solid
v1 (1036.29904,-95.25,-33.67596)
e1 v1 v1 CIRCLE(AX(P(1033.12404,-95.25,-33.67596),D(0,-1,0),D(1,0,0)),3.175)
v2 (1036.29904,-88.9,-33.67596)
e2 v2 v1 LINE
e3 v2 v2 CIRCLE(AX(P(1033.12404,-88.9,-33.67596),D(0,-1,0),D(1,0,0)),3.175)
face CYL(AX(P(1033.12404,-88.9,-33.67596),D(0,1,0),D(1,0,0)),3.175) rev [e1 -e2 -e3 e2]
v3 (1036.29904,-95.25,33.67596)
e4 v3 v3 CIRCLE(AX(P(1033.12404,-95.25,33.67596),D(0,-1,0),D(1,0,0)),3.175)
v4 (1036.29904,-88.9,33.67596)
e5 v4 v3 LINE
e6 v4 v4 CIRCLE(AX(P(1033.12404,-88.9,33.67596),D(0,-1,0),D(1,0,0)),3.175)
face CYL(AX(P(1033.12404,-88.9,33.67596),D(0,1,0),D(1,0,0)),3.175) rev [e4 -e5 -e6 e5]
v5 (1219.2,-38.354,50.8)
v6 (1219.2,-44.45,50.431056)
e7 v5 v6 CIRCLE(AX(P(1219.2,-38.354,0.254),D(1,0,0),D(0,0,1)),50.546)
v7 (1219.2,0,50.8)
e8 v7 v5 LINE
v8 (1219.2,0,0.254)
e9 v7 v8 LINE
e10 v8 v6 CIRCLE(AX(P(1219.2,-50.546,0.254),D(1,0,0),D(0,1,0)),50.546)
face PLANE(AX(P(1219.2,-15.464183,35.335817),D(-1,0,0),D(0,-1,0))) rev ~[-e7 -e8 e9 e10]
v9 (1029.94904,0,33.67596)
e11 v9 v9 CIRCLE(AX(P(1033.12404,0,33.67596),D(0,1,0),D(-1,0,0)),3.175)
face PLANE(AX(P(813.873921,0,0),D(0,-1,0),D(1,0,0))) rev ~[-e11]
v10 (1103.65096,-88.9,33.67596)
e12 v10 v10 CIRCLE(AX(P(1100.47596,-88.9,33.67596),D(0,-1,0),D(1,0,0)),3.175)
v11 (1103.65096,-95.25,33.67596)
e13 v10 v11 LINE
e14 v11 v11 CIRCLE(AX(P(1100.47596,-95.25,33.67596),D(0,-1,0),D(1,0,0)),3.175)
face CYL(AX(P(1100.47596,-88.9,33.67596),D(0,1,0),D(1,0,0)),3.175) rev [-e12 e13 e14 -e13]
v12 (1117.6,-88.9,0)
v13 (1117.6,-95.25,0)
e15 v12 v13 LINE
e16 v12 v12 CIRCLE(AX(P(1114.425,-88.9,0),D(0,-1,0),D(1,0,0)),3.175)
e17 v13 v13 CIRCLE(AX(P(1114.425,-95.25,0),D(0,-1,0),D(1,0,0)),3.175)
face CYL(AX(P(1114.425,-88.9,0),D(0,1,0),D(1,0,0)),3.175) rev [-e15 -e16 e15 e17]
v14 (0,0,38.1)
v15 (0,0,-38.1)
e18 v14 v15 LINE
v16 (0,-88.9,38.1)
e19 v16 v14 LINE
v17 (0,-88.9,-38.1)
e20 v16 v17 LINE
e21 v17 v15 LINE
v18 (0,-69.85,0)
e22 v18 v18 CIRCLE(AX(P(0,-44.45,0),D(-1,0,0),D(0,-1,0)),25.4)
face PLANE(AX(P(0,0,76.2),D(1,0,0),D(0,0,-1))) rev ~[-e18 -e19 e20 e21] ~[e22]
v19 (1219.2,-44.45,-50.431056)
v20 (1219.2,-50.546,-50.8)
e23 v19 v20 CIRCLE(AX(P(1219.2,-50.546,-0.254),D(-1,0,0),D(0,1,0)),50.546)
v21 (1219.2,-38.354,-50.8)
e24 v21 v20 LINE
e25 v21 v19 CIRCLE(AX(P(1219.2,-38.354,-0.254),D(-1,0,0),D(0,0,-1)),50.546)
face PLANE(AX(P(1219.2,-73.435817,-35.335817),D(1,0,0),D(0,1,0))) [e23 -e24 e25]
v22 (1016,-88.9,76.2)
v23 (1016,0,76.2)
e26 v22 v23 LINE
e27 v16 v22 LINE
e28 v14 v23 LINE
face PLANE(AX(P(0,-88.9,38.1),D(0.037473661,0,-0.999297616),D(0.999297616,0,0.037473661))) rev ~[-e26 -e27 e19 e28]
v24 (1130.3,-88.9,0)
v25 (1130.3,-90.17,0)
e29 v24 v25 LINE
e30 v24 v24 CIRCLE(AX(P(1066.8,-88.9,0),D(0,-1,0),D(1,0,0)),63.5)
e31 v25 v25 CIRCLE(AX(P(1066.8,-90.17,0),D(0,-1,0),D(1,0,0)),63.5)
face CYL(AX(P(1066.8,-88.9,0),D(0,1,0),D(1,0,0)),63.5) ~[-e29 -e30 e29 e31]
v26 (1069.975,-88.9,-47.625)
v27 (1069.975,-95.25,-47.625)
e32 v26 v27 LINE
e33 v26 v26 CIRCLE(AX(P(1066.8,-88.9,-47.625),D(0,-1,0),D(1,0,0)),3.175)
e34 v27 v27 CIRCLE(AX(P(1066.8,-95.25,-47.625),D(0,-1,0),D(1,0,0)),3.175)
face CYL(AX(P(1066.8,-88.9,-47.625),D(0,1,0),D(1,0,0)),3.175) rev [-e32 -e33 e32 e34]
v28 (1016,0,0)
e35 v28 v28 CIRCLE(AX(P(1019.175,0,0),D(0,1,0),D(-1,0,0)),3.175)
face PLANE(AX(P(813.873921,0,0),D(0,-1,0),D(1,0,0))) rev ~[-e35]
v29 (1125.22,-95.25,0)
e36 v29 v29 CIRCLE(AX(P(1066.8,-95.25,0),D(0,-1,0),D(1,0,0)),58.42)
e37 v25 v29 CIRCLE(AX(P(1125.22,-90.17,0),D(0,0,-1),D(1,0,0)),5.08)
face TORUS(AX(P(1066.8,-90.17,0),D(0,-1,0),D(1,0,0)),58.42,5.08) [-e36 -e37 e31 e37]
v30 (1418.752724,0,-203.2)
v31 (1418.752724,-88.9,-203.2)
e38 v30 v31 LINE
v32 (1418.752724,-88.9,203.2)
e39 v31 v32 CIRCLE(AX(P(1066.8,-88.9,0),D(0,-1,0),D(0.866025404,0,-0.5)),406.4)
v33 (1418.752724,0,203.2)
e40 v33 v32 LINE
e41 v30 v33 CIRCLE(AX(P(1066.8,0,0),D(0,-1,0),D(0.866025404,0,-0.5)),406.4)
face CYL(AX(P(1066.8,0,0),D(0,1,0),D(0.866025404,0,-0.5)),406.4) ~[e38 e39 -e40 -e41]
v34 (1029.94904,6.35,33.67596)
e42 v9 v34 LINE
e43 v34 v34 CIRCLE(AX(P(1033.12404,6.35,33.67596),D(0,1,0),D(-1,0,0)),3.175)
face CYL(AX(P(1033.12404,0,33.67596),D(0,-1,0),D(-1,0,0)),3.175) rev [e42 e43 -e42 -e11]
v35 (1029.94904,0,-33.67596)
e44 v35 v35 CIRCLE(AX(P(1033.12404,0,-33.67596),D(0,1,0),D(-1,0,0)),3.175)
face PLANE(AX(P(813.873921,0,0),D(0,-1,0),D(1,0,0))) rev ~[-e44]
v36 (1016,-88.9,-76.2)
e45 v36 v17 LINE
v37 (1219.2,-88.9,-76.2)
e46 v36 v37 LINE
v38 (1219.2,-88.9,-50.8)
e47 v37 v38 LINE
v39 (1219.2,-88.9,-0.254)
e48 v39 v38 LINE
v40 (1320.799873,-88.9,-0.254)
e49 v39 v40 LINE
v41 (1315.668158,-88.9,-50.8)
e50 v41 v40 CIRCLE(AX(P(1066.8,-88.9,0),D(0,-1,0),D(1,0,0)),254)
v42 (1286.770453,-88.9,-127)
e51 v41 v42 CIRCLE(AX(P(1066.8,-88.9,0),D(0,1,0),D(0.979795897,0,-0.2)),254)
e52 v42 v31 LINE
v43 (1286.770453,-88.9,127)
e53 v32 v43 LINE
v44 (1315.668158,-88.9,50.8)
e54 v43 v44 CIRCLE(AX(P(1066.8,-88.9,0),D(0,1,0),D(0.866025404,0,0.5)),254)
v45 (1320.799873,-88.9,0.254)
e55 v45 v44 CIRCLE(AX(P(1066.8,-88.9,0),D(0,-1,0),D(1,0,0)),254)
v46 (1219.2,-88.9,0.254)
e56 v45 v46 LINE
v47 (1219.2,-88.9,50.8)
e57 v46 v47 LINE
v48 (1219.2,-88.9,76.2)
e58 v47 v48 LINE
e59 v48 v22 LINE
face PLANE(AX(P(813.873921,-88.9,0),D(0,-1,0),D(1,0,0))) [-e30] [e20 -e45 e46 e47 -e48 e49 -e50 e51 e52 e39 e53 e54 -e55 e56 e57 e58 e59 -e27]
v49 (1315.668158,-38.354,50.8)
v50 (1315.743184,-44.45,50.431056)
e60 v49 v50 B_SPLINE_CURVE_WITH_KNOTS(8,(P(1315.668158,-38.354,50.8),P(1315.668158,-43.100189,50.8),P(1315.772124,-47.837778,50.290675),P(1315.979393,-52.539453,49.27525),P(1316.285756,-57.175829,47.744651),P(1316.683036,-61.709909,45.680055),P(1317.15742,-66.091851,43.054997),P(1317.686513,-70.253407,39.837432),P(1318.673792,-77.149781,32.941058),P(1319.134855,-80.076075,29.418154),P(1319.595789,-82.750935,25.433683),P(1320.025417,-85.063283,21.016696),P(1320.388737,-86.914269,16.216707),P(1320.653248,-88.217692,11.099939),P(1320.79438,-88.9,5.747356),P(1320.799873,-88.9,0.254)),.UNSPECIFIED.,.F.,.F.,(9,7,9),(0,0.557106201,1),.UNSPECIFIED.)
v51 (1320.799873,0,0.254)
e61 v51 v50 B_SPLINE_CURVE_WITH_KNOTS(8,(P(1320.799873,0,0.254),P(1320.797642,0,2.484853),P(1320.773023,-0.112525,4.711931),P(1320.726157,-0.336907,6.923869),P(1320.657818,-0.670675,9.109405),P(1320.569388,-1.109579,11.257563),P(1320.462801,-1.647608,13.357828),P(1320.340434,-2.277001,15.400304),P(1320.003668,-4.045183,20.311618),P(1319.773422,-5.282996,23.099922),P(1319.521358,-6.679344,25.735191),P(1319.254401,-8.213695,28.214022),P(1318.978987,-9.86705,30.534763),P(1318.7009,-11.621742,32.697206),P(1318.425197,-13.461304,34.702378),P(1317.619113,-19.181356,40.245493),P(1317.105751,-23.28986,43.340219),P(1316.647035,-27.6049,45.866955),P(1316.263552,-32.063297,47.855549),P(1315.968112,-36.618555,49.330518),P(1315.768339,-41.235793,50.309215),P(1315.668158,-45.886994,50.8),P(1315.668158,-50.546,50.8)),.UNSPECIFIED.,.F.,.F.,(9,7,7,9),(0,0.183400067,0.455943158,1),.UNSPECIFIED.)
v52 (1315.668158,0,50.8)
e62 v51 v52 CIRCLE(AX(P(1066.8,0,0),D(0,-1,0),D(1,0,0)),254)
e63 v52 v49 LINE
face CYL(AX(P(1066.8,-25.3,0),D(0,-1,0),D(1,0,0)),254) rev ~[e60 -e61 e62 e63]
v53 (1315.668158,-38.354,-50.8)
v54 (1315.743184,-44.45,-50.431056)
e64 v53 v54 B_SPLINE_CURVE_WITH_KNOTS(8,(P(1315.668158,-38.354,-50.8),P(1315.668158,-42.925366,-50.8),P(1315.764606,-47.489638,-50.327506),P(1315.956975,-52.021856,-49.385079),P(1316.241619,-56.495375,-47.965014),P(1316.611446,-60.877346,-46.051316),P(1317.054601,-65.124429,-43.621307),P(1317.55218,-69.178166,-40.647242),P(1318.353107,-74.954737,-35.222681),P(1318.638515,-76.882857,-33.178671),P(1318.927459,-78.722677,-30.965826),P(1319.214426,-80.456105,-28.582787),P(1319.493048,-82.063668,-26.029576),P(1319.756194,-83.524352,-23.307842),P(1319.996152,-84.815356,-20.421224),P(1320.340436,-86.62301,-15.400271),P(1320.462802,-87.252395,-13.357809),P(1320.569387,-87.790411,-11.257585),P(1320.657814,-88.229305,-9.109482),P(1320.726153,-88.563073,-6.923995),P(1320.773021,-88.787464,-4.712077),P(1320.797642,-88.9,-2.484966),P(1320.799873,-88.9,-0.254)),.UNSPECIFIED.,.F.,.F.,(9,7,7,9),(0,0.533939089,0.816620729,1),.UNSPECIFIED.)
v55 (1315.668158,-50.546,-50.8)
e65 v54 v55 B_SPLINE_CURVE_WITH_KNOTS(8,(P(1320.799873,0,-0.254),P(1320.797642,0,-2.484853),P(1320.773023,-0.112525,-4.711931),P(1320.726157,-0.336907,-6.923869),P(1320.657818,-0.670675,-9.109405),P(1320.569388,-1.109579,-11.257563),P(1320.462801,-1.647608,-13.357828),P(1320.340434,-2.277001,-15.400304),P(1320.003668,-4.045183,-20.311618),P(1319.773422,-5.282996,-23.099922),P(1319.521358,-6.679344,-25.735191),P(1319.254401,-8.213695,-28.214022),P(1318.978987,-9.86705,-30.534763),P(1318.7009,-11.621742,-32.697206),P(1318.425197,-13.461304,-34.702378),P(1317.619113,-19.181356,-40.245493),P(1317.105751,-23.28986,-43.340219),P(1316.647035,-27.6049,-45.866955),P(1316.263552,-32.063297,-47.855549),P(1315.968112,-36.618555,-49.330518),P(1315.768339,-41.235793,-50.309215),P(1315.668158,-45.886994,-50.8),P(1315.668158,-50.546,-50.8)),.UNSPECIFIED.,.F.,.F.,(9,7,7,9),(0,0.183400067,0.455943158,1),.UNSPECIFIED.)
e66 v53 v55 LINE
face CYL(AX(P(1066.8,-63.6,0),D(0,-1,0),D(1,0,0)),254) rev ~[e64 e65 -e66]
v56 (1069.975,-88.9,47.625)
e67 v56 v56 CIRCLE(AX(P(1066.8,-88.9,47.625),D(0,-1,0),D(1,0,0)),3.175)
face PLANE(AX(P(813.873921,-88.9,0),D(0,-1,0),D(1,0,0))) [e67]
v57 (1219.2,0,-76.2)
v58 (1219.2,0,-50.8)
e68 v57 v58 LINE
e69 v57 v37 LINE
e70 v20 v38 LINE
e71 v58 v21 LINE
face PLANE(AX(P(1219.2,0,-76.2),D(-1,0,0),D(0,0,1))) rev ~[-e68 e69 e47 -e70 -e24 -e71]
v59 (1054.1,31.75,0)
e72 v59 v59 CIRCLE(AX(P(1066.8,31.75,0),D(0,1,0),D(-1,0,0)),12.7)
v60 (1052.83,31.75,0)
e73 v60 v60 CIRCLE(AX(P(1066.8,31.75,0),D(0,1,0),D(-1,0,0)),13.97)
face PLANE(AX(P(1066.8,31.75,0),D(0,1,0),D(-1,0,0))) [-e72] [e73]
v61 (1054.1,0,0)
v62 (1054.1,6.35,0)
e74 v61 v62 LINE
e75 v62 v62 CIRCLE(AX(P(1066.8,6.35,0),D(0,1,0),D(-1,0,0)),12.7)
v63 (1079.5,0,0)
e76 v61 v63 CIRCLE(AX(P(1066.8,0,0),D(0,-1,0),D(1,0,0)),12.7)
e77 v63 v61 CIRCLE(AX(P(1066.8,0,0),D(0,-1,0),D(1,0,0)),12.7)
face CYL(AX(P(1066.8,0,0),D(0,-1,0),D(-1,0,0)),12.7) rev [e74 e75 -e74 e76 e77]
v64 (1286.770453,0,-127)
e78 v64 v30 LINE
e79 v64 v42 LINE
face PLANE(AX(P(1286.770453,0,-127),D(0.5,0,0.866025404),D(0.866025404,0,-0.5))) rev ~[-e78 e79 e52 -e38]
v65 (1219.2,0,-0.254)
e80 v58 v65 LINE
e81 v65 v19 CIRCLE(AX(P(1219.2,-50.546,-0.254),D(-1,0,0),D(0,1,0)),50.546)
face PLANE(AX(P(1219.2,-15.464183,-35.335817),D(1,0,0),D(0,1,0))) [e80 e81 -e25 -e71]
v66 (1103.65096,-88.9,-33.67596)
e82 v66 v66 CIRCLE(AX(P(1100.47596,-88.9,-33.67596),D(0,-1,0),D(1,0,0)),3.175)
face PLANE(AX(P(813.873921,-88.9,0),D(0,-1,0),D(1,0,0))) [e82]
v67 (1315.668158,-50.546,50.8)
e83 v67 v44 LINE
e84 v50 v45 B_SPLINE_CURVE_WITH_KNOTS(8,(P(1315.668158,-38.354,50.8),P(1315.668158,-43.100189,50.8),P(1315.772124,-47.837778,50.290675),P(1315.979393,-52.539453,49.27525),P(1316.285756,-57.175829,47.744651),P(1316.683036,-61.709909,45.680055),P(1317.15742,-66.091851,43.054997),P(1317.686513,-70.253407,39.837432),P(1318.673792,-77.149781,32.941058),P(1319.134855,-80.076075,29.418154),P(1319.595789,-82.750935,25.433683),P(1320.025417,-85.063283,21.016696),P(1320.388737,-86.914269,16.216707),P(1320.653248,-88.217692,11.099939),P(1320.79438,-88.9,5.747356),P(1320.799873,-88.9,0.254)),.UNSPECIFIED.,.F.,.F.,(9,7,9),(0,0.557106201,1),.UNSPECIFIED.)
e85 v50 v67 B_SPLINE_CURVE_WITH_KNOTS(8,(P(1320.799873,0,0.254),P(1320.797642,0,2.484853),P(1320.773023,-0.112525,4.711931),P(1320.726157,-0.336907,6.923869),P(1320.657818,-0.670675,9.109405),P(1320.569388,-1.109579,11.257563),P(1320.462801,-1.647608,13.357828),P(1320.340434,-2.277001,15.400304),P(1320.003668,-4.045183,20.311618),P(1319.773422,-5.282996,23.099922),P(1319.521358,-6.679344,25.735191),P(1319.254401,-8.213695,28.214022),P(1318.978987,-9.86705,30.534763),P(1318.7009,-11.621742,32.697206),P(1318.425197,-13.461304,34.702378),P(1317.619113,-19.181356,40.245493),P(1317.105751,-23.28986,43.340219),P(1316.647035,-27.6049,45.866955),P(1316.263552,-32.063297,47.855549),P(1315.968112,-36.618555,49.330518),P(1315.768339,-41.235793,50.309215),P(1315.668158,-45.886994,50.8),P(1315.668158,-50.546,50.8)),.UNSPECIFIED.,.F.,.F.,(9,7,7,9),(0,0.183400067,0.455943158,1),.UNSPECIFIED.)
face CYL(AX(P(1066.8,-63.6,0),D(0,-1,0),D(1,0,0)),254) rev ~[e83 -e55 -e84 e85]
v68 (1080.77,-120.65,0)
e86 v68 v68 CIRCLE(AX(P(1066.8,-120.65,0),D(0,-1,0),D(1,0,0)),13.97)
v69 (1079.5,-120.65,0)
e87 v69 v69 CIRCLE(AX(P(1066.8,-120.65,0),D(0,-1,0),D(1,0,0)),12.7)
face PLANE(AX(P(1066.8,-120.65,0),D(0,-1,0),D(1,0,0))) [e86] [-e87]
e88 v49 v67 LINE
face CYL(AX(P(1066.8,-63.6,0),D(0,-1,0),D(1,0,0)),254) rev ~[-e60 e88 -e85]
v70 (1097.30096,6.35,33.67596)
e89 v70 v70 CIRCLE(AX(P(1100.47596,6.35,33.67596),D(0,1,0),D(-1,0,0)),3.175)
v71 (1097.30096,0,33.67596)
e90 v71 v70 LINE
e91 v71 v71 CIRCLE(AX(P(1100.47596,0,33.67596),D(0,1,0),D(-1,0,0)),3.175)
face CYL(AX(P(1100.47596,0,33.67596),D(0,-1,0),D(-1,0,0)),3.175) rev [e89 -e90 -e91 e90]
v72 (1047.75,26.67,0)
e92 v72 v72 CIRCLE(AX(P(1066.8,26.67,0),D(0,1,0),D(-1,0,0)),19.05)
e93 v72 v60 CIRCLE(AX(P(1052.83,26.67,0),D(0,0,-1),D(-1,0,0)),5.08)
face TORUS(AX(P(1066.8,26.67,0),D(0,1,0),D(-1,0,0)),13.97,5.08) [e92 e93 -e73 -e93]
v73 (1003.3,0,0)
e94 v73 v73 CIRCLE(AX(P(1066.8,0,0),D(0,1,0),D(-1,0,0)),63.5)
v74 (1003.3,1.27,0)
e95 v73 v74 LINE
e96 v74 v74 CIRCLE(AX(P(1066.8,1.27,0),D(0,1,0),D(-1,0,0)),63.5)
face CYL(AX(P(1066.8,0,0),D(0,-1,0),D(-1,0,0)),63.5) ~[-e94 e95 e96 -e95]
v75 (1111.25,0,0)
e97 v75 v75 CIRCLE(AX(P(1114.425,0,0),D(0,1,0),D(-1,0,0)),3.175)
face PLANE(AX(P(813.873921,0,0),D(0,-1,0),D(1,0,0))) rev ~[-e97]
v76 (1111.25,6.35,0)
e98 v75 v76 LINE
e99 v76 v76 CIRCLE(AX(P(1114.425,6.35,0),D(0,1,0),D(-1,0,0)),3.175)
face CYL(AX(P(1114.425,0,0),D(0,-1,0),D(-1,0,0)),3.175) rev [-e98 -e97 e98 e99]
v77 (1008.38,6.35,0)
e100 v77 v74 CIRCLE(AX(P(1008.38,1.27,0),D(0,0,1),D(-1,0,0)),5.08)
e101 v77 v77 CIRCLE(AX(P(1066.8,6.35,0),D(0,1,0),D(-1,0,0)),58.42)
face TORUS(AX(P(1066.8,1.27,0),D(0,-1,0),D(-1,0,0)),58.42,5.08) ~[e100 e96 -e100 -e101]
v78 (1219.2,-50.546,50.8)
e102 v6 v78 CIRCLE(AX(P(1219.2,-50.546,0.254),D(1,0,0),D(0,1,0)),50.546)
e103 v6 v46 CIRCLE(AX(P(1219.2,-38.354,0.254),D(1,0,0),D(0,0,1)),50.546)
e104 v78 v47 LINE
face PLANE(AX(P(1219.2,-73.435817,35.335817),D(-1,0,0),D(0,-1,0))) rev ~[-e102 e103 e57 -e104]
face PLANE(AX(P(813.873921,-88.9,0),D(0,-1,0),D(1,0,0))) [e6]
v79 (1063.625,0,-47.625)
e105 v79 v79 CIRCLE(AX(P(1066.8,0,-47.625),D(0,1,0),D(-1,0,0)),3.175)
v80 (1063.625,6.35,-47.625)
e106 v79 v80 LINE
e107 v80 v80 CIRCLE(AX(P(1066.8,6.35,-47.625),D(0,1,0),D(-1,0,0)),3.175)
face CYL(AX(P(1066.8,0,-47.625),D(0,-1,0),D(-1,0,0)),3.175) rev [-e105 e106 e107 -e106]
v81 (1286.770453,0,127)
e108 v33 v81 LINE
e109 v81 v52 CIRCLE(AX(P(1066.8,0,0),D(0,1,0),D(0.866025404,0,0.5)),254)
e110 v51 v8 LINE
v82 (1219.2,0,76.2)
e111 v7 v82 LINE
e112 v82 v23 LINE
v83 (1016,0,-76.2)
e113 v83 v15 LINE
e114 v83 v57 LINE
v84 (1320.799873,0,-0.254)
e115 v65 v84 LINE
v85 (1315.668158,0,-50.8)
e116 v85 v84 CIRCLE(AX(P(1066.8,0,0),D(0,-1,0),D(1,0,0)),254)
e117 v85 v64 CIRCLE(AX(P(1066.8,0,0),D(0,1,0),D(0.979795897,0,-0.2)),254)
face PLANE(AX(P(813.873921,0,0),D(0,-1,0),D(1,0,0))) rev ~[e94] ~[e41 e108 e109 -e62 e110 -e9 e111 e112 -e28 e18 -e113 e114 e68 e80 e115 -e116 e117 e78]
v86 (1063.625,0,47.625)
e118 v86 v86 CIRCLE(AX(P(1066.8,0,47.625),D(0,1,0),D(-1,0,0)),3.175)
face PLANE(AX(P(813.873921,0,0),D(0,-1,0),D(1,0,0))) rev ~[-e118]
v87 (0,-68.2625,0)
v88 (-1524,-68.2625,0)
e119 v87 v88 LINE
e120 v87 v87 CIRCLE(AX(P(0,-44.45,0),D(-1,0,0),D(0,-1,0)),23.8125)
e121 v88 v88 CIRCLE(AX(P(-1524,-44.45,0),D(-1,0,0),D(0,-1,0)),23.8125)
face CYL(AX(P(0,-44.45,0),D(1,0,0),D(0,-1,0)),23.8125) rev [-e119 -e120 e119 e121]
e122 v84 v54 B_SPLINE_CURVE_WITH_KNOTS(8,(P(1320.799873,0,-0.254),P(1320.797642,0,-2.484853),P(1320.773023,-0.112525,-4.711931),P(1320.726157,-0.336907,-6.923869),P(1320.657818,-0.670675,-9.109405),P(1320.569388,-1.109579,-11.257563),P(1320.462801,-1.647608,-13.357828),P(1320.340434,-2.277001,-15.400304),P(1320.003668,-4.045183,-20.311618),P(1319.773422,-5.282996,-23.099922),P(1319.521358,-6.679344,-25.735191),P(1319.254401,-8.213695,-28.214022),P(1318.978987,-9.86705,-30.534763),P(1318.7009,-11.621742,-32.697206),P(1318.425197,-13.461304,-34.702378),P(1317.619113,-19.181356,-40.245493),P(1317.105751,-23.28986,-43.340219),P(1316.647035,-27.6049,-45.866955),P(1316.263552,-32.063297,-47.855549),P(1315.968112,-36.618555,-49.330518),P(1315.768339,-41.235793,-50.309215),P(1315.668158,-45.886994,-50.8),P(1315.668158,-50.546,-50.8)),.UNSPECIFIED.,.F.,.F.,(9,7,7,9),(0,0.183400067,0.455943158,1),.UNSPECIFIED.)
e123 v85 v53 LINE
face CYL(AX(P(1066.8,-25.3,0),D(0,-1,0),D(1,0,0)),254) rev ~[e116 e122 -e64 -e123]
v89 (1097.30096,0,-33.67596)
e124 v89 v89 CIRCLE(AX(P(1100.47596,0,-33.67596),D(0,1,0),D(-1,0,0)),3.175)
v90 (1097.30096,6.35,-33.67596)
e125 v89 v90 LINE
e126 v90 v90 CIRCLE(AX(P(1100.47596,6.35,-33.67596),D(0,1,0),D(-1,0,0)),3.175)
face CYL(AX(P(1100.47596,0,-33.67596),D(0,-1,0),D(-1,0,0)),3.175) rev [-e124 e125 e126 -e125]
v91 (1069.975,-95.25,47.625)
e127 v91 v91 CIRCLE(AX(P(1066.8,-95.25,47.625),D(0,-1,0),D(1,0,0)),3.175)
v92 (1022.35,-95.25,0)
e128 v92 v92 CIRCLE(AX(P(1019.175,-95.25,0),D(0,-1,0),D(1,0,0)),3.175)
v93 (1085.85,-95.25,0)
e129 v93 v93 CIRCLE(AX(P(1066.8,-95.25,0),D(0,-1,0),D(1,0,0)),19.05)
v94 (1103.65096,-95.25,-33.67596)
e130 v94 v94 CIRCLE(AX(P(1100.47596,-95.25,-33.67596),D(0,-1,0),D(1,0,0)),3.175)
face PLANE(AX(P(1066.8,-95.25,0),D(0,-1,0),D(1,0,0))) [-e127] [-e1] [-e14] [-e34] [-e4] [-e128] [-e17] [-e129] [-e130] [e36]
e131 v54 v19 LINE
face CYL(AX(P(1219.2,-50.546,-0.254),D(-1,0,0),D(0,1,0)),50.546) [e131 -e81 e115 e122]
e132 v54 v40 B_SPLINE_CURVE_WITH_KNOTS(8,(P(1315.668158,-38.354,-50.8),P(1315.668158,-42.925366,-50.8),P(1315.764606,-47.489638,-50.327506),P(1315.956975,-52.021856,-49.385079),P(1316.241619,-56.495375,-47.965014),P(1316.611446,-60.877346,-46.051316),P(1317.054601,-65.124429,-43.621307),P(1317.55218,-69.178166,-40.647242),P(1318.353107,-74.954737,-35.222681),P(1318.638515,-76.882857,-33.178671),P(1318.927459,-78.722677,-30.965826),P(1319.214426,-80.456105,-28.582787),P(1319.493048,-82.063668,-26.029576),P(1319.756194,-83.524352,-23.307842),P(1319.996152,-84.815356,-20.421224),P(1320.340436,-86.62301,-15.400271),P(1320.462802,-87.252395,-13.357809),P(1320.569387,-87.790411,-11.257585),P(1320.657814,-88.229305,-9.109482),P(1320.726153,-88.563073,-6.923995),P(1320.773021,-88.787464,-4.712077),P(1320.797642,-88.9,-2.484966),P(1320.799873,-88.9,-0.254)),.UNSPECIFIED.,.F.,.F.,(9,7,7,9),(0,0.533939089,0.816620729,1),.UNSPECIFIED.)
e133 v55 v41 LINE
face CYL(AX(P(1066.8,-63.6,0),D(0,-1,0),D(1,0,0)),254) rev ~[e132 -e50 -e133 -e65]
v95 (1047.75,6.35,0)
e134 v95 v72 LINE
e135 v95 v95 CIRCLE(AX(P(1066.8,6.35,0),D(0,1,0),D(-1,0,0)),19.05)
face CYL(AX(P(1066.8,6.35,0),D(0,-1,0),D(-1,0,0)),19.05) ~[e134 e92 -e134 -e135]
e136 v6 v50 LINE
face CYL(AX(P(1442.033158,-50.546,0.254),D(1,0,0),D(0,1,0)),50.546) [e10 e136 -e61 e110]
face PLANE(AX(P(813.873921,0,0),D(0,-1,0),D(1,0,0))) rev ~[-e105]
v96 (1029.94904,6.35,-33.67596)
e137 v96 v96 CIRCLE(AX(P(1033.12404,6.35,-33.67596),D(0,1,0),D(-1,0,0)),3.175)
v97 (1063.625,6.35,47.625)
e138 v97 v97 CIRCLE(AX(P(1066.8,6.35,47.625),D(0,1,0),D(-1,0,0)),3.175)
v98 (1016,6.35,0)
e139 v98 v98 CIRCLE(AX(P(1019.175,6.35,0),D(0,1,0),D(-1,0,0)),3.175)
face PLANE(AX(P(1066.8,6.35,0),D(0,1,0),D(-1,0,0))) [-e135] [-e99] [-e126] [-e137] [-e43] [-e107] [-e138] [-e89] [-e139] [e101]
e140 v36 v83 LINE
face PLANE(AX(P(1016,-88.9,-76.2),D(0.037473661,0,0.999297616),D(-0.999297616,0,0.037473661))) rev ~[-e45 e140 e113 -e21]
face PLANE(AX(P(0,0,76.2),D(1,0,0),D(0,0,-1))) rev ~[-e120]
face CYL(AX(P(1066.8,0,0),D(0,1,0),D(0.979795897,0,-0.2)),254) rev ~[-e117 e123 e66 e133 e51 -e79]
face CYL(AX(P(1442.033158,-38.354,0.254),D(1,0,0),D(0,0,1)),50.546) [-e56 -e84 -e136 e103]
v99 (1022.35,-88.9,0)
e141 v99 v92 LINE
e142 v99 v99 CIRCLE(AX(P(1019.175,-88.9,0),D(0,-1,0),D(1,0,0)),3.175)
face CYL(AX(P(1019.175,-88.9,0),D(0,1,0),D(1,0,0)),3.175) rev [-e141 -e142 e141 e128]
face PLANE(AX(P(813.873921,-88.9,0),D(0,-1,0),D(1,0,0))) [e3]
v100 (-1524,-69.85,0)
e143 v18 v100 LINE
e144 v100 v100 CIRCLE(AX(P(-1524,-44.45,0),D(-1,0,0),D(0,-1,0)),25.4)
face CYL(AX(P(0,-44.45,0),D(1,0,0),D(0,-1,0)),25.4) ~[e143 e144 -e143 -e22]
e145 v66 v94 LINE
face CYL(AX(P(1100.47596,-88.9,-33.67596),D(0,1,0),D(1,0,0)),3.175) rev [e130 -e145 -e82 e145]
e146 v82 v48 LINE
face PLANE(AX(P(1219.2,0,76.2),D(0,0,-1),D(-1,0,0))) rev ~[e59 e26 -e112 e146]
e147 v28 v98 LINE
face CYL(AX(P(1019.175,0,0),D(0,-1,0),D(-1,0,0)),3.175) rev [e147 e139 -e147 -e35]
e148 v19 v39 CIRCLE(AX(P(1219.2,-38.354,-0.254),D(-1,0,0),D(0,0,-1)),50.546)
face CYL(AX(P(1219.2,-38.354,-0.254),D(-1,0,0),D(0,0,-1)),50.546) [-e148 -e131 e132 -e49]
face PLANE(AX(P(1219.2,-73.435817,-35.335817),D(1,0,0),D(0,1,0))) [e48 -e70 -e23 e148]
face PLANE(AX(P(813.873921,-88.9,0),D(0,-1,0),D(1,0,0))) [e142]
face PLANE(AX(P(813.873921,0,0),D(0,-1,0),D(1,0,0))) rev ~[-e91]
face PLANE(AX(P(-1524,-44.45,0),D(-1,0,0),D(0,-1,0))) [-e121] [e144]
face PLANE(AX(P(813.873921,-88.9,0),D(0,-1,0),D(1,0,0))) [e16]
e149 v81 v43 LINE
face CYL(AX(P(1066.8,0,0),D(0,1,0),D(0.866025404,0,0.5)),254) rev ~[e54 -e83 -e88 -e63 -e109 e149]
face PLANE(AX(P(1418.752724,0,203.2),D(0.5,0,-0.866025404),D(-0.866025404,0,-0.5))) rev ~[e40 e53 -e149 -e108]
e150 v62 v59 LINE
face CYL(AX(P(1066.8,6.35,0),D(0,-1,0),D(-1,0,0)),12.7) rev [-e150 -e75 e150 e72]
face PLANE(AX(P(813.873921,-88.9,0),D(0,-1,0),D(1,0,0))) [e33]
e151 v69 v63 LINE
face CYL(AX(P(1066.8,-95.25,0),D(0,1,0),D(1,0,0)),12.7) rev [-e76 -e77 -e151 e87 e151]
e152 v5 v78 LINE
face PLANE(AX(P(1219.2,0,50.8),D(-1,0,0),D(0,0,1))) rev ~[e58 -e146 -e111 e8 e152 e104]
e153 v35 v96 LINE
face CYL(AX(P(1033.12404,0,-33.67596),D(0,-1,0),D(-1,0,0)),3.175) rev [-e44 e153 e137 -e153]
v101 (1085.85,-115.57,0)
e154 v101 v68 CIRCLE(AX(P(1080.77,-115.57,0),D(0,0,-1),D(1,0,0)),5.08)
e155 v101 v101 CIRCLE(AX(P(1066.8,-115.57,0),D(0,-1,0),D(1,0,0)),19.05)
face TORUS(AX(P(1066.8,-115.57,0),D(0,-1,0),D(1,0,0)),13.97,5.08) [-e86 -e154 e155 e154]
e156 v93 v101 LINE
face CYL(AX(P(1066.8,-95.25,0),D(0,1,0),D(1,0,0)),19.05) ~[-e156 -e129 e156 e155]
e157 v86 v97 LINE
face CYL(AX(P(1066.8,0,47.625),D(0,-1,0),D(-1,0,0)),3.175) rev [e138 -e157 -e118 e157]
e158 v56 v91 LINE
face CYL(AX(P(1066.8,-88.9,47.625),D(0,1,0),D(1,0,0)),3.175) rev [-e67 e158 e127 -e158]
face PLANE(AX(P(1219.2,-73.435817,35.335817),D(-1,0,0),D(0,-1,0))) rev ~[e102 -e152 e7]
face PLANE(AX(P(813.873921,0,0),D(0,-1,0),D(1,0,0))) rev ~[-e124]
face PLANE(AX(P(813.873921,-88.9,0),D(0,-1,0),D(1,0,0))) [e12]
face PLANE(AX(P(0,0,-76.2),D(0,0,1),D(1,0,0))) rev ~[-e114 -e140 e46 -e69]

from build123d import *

# Parameters (mm, degrees)
F1_R          = 12.7
F2_DEPTH      = 88.9
F4_DEPTH      = 152.4
F5_R          = 25.4
F5_R_2        = 23.8125
F6_DEPTH      = 1524
F7_R          = 63.5
F7_R_2        = 3.175
F7_R_3        = 12.7
F8_DEPTH      = 6.35
F9_R          = 19.05
F9_R_2        = 12.7
F10_DEPTH     = 25.4
F11_R         = 5.08
F12_R         = 63.5
F12_R_2       = 3.175
F12_R_3       = 12.7
F13_DEPTH     = 6.35
F14_R         = 19.05
F14_R_2       = 12.7
F15_DEPTH     = 25.4
F16_R         = 5.08
F17_T4_DEPTH  = 222.8331578668
F17_S5_R      = 254
F17_T6_DEPTH  = 119
F17_T10_DEPTH = 222.8331578668
F17_S11_R     = 254
F17_T12_DEPTH = 119
F17_T16_DEPTH = 222.8331578668
F17_S17_R     = 254
F17_T18_DEPTH = 119
F17_T22_DEPTH = 222.8331578668
F17_S23_R     = 254
F17_T24_DEPTH = 119


# Not quite as in the source:
# - a fillet or chamfer that OpenCascade refuses, or shapes differently, is made with other operations: its cross-section is extruded or revolved along the edge and cut away or added


with BuildPart() as f2:
    # F1 (on Front) → F2 (new body)
    with BuildSketch(Plane.XZ):
        with BuildLine():
            Line((0, 76.2), (0, -76.2))
            Line((0, -76.2), (1219.2, -76.2))
            Line((1219.2, -76.2), (1219.2, -50.8))
            Line((1219.2, -50.8), (1315.6681578668, -50.8))
            ThreePointArc((1315.6681578668, -50.8), (1304.2953066, -90.0665273172), (1286.7704525612, -127))
            Line((1286.7704525612, -127), (1418.752724098, -203.2))
            ThreePointArc((1418.752724098, -203.2), (1473.2, 0), (1418.752724098, 203.2))
            Line((1418.752724098, 203.2), (1286.7704525612, 127))
            ThreePointArc((1286.7704525612, 127), (1304.2953066, 90.0665273172), (1315.6681578668, 50.8))
            Line((1315.6681578668, 50.8), (1219.2, 50.8))
            Line((1219.2, 50.8), (1219.2, 76.2))
            Line((1219.2, 76.2), (0, 76.2))
        make_face()
        with Locations((1066.8, 0)):
            Circle(F1_R, mode=Mode.SUBTRACT)
    extrude(amount=F2_DEPTH)

    # F3 (on face) → F4 (cut)
    with BuildSketch(Plane.XZ.offset(88.9)):
        Polygon((1016, 76.2), (0, 76.2), (0, 38.1), align=None)
        Polygon((0, -38.1), (0, -76.2), (1016, -76.2), align=None)
    extrude(amount=-F4_DEPTH, mode=Mode.SUBTRACT)

    # F5 (on face) → F6 (join)
    with BuildSketch(Plane(origin=(0, 0, 0), x_dir=(0, -1, 0), z_dir=(-1, 0, 0))):
        with Locations((44.45, 0)):
            Circle(F5_R)
        with Locations((44.45, 0)):
            Circle(F5_R_2, mode=Mode.SUBTRACT)
    extrude(amount=F6_DEPTH)

    # F7 (on face) → F8 (join)
    with BuildSketch(Plane.XZ.offset(88.9)):
        with Locations((1066.8, 0)):
            Circle(F7_R)
        with Locations((1033.124039546, -33.675960454)):
            Circle(F7_R_2, mode=Mode.SUBTRACT)
        with Locations((1066.8, -47.625)):
            Circle(F7_R_2, mode=Mode.SUBTRACT)
        with Locations((1100.475960454, -33.675960454)):
            Circle(F7_R_2, mode=Mode.SUBTRACT)
        with Locations((1019.175, 0)):
            Circle(F7_R_2, mode=Mode.SUBTRACT)
        with Locations((1033.124039546, 33.675960454)):
            Circle(F7_R_2, mode=Mode.SUBTRACT)
        with Locations((1066.8, 0)):
            Circle(F7_R_3, mode=Mode.SUBTRACT)
        with Locations((1114.425, 0)):
            Circle(F7_R_2, mode=Mode.SUBTRACT)
        with Locations((1066.8, 47.625)):
            Circle(F7_R_2, mode=Mode.SUBTRACT)
        with Locations((1100.475960454, 33.675960454)):
            Circle(F7_R_2, mode=Mode.SUBTRACT)
    extrude(amount=F8_DEPTH)

    # F9 (on face) → F10 (join)
    with BuildSketch(Plane.XZ.offset(95.25)):
        with Locations((1066.8, 0)):
            Circle(F9_R)
        with Locations((1066.8, 0)):
            Circle(F9_R_2, mode=Mode.SUBTRACT)
    extrude(amount=F10_DEPTH)

    # F11
    f11_edges = [f2.edges().sort_by_distance(p)[0] for p in [
        (1047.75, -120.65, 0),
        (1003.3, -95.25, 0),
    ]]
    fillet(f11_edges, radius=F11_R)

    # F12 (on face) → F13 (join)
    with BuildSketch(Plane(origin=(0, 0, 0), x_dir=(-1, 0, 0), z_dir=(0, 1, 0))):
        with Locations((-1066.8, 0)):
            Circle(F12_R)
        with Locations((-1100.475960454, -33.675960454)):
            Circle(F12_R_2, mode=Mode.SUBTRACT)
        with Locations((-1066.8, -47.625)):
            Circle(F12_R_2, mode=Mode.SUBTRACT)
        with Locations((-1033.124039546, -33.675960454)):
            Circle(F12_R_2, mode=Mode.SUBTRACT)
        with Locations((-1114.425, 0)):
            Circle(F12_R_2, mode=Mode.SUBTRACT)
        with Locations((-1100.475960454, 33.675960454)):
            Circle(F12_R_2, mode=Mode.SUBTRACT)
        with Locations((-1066.8, 0)):
            Circle(F12_R_3, mode=Mode.SUBTRACT)
        with Locations((-1019.175, 0)):
            Circle(F12_R_2, mode=Mode.SUBTRACT)
        with Locations((-1066.8, 47.625)):
            Circle(F12_R_2, mode=Mode.SUBTRACT)
        with Locations((-1033.124039546, 33.675960454)):
            Circle(F12_R_2, mode=Mode.SUBTRACT)
    extrude(amount=F13_DEPTH)

    # F14 (on face) → F15 (join)
    with BuildSketch(Plane(origin=(0, 6.35, 0), x_dir=(-1, 0, 0), z_dir=(0, 1, 0))):
        with Locations((-1066.8, 0)):
            Circle(F14_R)
        with Locations((-1066.8, 0)):
            Circle(F14_R_2, mode=Mode.SUBTRACT)
    extrude(amount=F15_DEPTH)

    # F16
    f16_edges = [f2.edges().sort_by_distance(p)[0] for p in [
        (1130.3, 6.35, 0),
        (1085.85, 31.75, 0),
    ]]
    fillet(f16_edges, radius=F16_R)

    # F17: fillet of radius 50.546 on 4 edges, made by hand


with BuildPart() as f17_tool2:
    # F17_s3 → F17_t4 (new body)
    with BuildSketch(Plane.YZ.offset(1442.0331578668)):
        with BuildLine():
            ThreePointArc((-38.354, 50.8), (-74.0954193619, 35.9954193619), (-88.9, 0.254))
            Line((-88.9, 0.254), (-88.9, 50.8))
            Line((-88.9, 50.8), (-38.354, 50.8))
        make_face()
    extrude(amount=-F17_T4_DEPTH)

    # F17_s5 → F17_t6 (intersect, symmetric)
    with BuildSketch(Plane.XZ.offset(63.6)):
        with Locations((1066.8, 0)):
            Circle(F17_S5_R)
    extrude(amount=F17_T6_DEPTH, both=True, mode=Mode.INTERSECT)


with BuildPart() as f2_1:
    add(f2.part)

    # F17_t1: cut F17_tool2
    add(f17_tool2.part, mode=Mode.SUBTRACT)


with BuildPart() as f17_tool8:
    # F17_s9 → F17_t10 (new body)
    with BuildSketch(Plane.YZ.offset(1219.2)):
        with BuildLine():
            ThreePointArc((-38.354, -50.8), (-74.0954193619, -35.9954193619), (-88.9, -0.254))
            Line((-88.9, -0.254), (-88.9, -50.8))
            Line((-88.9, -50.8), (-38.354, -50.8))
        make_face()
    extrude(amount=F17_T10_DEPTH)

    # F17_s11 → F17_t12 (intersect, symmetric)
    with BuildSketch(Plane.XZ.offset(63.6)):
        with Locations((1066.8, 0)):
            Circle(F17_S11_R)
    extrude(amount=F17_T12_DEPTH, both=True, mode=Mode.INTERSECT)


with BuildPart() as f2_2:
    add(f2_1.part)

    # F17_t7: cut F17_tool8
    add(f17_tool8.part, mode=Mode.SUBTRACT)


with BuildPart() as f17_tool14:
    # F17_s15 → F17_t16 (new body)
    with BuildSketch(Plane.YZ.offset(1219.2)):
        with BuildLine():
            ThreePointArc((0, -0.254), (-14.8045806381, -35.9954193619), (-50.546, -50.8))
            Line((-50.546, -50.8), (0, -50.8))
            Line((0, -50.8), (0, -0.254))
        make_face()
    extrude(amount=F17_T16_DEPTH)

    # F17_s17 → F17_t18 (intersect, symmetric)
    with BuildSketch(Plane.XZ.offset(25.3)):
        with Locations((1066.8, 0)):
            Circle(F17_S17_R)
    extrude(amount=F17_T18_DEPTH, both=True, mode=Mode.INTERSECT)


with BuildPart() as f2_3:
    add(f2_2.part)

    # F17_t13: cut F17_tool14
    add(f17_tool14.part, mode=Mode.SUBTRACT)


with BuildPart() as f17_tool20:
    # F17_s21 → F17_t22 (new body)
    with BuildSketch(Plane.YZ.offset(1442.0331578668)):
        with BuildLine():
            ThreePointArc((0, 0.254), (-14.8045806381, 35.9954193619), (-50.546, 50.8))
            Line((-50.546, 50.8), (0, 50.8))
            Line((0, 50.8), (0, 0.254))
        make_face()
    extrude(amount=-F17_T22_DEPTH)

    # F17_s23 → F17_t24 (intersect, symmetric)
    with BuildSketch(Plane.XZ.offset(25.3)):
        with Locations((1066.8, 0)):
            Circle(F17_S23_R)
    extrude(amount=F17_T24_DEPTH, both=True, mode=Mode.INTERSECT)


with BuildPart() as f2_4:
    add(f2_3.part)

    # F17_t19: cut F17_tool20
    add(f17_tool20.part, mode=Mode.SUBTRACT)


solid = f2_4.part
